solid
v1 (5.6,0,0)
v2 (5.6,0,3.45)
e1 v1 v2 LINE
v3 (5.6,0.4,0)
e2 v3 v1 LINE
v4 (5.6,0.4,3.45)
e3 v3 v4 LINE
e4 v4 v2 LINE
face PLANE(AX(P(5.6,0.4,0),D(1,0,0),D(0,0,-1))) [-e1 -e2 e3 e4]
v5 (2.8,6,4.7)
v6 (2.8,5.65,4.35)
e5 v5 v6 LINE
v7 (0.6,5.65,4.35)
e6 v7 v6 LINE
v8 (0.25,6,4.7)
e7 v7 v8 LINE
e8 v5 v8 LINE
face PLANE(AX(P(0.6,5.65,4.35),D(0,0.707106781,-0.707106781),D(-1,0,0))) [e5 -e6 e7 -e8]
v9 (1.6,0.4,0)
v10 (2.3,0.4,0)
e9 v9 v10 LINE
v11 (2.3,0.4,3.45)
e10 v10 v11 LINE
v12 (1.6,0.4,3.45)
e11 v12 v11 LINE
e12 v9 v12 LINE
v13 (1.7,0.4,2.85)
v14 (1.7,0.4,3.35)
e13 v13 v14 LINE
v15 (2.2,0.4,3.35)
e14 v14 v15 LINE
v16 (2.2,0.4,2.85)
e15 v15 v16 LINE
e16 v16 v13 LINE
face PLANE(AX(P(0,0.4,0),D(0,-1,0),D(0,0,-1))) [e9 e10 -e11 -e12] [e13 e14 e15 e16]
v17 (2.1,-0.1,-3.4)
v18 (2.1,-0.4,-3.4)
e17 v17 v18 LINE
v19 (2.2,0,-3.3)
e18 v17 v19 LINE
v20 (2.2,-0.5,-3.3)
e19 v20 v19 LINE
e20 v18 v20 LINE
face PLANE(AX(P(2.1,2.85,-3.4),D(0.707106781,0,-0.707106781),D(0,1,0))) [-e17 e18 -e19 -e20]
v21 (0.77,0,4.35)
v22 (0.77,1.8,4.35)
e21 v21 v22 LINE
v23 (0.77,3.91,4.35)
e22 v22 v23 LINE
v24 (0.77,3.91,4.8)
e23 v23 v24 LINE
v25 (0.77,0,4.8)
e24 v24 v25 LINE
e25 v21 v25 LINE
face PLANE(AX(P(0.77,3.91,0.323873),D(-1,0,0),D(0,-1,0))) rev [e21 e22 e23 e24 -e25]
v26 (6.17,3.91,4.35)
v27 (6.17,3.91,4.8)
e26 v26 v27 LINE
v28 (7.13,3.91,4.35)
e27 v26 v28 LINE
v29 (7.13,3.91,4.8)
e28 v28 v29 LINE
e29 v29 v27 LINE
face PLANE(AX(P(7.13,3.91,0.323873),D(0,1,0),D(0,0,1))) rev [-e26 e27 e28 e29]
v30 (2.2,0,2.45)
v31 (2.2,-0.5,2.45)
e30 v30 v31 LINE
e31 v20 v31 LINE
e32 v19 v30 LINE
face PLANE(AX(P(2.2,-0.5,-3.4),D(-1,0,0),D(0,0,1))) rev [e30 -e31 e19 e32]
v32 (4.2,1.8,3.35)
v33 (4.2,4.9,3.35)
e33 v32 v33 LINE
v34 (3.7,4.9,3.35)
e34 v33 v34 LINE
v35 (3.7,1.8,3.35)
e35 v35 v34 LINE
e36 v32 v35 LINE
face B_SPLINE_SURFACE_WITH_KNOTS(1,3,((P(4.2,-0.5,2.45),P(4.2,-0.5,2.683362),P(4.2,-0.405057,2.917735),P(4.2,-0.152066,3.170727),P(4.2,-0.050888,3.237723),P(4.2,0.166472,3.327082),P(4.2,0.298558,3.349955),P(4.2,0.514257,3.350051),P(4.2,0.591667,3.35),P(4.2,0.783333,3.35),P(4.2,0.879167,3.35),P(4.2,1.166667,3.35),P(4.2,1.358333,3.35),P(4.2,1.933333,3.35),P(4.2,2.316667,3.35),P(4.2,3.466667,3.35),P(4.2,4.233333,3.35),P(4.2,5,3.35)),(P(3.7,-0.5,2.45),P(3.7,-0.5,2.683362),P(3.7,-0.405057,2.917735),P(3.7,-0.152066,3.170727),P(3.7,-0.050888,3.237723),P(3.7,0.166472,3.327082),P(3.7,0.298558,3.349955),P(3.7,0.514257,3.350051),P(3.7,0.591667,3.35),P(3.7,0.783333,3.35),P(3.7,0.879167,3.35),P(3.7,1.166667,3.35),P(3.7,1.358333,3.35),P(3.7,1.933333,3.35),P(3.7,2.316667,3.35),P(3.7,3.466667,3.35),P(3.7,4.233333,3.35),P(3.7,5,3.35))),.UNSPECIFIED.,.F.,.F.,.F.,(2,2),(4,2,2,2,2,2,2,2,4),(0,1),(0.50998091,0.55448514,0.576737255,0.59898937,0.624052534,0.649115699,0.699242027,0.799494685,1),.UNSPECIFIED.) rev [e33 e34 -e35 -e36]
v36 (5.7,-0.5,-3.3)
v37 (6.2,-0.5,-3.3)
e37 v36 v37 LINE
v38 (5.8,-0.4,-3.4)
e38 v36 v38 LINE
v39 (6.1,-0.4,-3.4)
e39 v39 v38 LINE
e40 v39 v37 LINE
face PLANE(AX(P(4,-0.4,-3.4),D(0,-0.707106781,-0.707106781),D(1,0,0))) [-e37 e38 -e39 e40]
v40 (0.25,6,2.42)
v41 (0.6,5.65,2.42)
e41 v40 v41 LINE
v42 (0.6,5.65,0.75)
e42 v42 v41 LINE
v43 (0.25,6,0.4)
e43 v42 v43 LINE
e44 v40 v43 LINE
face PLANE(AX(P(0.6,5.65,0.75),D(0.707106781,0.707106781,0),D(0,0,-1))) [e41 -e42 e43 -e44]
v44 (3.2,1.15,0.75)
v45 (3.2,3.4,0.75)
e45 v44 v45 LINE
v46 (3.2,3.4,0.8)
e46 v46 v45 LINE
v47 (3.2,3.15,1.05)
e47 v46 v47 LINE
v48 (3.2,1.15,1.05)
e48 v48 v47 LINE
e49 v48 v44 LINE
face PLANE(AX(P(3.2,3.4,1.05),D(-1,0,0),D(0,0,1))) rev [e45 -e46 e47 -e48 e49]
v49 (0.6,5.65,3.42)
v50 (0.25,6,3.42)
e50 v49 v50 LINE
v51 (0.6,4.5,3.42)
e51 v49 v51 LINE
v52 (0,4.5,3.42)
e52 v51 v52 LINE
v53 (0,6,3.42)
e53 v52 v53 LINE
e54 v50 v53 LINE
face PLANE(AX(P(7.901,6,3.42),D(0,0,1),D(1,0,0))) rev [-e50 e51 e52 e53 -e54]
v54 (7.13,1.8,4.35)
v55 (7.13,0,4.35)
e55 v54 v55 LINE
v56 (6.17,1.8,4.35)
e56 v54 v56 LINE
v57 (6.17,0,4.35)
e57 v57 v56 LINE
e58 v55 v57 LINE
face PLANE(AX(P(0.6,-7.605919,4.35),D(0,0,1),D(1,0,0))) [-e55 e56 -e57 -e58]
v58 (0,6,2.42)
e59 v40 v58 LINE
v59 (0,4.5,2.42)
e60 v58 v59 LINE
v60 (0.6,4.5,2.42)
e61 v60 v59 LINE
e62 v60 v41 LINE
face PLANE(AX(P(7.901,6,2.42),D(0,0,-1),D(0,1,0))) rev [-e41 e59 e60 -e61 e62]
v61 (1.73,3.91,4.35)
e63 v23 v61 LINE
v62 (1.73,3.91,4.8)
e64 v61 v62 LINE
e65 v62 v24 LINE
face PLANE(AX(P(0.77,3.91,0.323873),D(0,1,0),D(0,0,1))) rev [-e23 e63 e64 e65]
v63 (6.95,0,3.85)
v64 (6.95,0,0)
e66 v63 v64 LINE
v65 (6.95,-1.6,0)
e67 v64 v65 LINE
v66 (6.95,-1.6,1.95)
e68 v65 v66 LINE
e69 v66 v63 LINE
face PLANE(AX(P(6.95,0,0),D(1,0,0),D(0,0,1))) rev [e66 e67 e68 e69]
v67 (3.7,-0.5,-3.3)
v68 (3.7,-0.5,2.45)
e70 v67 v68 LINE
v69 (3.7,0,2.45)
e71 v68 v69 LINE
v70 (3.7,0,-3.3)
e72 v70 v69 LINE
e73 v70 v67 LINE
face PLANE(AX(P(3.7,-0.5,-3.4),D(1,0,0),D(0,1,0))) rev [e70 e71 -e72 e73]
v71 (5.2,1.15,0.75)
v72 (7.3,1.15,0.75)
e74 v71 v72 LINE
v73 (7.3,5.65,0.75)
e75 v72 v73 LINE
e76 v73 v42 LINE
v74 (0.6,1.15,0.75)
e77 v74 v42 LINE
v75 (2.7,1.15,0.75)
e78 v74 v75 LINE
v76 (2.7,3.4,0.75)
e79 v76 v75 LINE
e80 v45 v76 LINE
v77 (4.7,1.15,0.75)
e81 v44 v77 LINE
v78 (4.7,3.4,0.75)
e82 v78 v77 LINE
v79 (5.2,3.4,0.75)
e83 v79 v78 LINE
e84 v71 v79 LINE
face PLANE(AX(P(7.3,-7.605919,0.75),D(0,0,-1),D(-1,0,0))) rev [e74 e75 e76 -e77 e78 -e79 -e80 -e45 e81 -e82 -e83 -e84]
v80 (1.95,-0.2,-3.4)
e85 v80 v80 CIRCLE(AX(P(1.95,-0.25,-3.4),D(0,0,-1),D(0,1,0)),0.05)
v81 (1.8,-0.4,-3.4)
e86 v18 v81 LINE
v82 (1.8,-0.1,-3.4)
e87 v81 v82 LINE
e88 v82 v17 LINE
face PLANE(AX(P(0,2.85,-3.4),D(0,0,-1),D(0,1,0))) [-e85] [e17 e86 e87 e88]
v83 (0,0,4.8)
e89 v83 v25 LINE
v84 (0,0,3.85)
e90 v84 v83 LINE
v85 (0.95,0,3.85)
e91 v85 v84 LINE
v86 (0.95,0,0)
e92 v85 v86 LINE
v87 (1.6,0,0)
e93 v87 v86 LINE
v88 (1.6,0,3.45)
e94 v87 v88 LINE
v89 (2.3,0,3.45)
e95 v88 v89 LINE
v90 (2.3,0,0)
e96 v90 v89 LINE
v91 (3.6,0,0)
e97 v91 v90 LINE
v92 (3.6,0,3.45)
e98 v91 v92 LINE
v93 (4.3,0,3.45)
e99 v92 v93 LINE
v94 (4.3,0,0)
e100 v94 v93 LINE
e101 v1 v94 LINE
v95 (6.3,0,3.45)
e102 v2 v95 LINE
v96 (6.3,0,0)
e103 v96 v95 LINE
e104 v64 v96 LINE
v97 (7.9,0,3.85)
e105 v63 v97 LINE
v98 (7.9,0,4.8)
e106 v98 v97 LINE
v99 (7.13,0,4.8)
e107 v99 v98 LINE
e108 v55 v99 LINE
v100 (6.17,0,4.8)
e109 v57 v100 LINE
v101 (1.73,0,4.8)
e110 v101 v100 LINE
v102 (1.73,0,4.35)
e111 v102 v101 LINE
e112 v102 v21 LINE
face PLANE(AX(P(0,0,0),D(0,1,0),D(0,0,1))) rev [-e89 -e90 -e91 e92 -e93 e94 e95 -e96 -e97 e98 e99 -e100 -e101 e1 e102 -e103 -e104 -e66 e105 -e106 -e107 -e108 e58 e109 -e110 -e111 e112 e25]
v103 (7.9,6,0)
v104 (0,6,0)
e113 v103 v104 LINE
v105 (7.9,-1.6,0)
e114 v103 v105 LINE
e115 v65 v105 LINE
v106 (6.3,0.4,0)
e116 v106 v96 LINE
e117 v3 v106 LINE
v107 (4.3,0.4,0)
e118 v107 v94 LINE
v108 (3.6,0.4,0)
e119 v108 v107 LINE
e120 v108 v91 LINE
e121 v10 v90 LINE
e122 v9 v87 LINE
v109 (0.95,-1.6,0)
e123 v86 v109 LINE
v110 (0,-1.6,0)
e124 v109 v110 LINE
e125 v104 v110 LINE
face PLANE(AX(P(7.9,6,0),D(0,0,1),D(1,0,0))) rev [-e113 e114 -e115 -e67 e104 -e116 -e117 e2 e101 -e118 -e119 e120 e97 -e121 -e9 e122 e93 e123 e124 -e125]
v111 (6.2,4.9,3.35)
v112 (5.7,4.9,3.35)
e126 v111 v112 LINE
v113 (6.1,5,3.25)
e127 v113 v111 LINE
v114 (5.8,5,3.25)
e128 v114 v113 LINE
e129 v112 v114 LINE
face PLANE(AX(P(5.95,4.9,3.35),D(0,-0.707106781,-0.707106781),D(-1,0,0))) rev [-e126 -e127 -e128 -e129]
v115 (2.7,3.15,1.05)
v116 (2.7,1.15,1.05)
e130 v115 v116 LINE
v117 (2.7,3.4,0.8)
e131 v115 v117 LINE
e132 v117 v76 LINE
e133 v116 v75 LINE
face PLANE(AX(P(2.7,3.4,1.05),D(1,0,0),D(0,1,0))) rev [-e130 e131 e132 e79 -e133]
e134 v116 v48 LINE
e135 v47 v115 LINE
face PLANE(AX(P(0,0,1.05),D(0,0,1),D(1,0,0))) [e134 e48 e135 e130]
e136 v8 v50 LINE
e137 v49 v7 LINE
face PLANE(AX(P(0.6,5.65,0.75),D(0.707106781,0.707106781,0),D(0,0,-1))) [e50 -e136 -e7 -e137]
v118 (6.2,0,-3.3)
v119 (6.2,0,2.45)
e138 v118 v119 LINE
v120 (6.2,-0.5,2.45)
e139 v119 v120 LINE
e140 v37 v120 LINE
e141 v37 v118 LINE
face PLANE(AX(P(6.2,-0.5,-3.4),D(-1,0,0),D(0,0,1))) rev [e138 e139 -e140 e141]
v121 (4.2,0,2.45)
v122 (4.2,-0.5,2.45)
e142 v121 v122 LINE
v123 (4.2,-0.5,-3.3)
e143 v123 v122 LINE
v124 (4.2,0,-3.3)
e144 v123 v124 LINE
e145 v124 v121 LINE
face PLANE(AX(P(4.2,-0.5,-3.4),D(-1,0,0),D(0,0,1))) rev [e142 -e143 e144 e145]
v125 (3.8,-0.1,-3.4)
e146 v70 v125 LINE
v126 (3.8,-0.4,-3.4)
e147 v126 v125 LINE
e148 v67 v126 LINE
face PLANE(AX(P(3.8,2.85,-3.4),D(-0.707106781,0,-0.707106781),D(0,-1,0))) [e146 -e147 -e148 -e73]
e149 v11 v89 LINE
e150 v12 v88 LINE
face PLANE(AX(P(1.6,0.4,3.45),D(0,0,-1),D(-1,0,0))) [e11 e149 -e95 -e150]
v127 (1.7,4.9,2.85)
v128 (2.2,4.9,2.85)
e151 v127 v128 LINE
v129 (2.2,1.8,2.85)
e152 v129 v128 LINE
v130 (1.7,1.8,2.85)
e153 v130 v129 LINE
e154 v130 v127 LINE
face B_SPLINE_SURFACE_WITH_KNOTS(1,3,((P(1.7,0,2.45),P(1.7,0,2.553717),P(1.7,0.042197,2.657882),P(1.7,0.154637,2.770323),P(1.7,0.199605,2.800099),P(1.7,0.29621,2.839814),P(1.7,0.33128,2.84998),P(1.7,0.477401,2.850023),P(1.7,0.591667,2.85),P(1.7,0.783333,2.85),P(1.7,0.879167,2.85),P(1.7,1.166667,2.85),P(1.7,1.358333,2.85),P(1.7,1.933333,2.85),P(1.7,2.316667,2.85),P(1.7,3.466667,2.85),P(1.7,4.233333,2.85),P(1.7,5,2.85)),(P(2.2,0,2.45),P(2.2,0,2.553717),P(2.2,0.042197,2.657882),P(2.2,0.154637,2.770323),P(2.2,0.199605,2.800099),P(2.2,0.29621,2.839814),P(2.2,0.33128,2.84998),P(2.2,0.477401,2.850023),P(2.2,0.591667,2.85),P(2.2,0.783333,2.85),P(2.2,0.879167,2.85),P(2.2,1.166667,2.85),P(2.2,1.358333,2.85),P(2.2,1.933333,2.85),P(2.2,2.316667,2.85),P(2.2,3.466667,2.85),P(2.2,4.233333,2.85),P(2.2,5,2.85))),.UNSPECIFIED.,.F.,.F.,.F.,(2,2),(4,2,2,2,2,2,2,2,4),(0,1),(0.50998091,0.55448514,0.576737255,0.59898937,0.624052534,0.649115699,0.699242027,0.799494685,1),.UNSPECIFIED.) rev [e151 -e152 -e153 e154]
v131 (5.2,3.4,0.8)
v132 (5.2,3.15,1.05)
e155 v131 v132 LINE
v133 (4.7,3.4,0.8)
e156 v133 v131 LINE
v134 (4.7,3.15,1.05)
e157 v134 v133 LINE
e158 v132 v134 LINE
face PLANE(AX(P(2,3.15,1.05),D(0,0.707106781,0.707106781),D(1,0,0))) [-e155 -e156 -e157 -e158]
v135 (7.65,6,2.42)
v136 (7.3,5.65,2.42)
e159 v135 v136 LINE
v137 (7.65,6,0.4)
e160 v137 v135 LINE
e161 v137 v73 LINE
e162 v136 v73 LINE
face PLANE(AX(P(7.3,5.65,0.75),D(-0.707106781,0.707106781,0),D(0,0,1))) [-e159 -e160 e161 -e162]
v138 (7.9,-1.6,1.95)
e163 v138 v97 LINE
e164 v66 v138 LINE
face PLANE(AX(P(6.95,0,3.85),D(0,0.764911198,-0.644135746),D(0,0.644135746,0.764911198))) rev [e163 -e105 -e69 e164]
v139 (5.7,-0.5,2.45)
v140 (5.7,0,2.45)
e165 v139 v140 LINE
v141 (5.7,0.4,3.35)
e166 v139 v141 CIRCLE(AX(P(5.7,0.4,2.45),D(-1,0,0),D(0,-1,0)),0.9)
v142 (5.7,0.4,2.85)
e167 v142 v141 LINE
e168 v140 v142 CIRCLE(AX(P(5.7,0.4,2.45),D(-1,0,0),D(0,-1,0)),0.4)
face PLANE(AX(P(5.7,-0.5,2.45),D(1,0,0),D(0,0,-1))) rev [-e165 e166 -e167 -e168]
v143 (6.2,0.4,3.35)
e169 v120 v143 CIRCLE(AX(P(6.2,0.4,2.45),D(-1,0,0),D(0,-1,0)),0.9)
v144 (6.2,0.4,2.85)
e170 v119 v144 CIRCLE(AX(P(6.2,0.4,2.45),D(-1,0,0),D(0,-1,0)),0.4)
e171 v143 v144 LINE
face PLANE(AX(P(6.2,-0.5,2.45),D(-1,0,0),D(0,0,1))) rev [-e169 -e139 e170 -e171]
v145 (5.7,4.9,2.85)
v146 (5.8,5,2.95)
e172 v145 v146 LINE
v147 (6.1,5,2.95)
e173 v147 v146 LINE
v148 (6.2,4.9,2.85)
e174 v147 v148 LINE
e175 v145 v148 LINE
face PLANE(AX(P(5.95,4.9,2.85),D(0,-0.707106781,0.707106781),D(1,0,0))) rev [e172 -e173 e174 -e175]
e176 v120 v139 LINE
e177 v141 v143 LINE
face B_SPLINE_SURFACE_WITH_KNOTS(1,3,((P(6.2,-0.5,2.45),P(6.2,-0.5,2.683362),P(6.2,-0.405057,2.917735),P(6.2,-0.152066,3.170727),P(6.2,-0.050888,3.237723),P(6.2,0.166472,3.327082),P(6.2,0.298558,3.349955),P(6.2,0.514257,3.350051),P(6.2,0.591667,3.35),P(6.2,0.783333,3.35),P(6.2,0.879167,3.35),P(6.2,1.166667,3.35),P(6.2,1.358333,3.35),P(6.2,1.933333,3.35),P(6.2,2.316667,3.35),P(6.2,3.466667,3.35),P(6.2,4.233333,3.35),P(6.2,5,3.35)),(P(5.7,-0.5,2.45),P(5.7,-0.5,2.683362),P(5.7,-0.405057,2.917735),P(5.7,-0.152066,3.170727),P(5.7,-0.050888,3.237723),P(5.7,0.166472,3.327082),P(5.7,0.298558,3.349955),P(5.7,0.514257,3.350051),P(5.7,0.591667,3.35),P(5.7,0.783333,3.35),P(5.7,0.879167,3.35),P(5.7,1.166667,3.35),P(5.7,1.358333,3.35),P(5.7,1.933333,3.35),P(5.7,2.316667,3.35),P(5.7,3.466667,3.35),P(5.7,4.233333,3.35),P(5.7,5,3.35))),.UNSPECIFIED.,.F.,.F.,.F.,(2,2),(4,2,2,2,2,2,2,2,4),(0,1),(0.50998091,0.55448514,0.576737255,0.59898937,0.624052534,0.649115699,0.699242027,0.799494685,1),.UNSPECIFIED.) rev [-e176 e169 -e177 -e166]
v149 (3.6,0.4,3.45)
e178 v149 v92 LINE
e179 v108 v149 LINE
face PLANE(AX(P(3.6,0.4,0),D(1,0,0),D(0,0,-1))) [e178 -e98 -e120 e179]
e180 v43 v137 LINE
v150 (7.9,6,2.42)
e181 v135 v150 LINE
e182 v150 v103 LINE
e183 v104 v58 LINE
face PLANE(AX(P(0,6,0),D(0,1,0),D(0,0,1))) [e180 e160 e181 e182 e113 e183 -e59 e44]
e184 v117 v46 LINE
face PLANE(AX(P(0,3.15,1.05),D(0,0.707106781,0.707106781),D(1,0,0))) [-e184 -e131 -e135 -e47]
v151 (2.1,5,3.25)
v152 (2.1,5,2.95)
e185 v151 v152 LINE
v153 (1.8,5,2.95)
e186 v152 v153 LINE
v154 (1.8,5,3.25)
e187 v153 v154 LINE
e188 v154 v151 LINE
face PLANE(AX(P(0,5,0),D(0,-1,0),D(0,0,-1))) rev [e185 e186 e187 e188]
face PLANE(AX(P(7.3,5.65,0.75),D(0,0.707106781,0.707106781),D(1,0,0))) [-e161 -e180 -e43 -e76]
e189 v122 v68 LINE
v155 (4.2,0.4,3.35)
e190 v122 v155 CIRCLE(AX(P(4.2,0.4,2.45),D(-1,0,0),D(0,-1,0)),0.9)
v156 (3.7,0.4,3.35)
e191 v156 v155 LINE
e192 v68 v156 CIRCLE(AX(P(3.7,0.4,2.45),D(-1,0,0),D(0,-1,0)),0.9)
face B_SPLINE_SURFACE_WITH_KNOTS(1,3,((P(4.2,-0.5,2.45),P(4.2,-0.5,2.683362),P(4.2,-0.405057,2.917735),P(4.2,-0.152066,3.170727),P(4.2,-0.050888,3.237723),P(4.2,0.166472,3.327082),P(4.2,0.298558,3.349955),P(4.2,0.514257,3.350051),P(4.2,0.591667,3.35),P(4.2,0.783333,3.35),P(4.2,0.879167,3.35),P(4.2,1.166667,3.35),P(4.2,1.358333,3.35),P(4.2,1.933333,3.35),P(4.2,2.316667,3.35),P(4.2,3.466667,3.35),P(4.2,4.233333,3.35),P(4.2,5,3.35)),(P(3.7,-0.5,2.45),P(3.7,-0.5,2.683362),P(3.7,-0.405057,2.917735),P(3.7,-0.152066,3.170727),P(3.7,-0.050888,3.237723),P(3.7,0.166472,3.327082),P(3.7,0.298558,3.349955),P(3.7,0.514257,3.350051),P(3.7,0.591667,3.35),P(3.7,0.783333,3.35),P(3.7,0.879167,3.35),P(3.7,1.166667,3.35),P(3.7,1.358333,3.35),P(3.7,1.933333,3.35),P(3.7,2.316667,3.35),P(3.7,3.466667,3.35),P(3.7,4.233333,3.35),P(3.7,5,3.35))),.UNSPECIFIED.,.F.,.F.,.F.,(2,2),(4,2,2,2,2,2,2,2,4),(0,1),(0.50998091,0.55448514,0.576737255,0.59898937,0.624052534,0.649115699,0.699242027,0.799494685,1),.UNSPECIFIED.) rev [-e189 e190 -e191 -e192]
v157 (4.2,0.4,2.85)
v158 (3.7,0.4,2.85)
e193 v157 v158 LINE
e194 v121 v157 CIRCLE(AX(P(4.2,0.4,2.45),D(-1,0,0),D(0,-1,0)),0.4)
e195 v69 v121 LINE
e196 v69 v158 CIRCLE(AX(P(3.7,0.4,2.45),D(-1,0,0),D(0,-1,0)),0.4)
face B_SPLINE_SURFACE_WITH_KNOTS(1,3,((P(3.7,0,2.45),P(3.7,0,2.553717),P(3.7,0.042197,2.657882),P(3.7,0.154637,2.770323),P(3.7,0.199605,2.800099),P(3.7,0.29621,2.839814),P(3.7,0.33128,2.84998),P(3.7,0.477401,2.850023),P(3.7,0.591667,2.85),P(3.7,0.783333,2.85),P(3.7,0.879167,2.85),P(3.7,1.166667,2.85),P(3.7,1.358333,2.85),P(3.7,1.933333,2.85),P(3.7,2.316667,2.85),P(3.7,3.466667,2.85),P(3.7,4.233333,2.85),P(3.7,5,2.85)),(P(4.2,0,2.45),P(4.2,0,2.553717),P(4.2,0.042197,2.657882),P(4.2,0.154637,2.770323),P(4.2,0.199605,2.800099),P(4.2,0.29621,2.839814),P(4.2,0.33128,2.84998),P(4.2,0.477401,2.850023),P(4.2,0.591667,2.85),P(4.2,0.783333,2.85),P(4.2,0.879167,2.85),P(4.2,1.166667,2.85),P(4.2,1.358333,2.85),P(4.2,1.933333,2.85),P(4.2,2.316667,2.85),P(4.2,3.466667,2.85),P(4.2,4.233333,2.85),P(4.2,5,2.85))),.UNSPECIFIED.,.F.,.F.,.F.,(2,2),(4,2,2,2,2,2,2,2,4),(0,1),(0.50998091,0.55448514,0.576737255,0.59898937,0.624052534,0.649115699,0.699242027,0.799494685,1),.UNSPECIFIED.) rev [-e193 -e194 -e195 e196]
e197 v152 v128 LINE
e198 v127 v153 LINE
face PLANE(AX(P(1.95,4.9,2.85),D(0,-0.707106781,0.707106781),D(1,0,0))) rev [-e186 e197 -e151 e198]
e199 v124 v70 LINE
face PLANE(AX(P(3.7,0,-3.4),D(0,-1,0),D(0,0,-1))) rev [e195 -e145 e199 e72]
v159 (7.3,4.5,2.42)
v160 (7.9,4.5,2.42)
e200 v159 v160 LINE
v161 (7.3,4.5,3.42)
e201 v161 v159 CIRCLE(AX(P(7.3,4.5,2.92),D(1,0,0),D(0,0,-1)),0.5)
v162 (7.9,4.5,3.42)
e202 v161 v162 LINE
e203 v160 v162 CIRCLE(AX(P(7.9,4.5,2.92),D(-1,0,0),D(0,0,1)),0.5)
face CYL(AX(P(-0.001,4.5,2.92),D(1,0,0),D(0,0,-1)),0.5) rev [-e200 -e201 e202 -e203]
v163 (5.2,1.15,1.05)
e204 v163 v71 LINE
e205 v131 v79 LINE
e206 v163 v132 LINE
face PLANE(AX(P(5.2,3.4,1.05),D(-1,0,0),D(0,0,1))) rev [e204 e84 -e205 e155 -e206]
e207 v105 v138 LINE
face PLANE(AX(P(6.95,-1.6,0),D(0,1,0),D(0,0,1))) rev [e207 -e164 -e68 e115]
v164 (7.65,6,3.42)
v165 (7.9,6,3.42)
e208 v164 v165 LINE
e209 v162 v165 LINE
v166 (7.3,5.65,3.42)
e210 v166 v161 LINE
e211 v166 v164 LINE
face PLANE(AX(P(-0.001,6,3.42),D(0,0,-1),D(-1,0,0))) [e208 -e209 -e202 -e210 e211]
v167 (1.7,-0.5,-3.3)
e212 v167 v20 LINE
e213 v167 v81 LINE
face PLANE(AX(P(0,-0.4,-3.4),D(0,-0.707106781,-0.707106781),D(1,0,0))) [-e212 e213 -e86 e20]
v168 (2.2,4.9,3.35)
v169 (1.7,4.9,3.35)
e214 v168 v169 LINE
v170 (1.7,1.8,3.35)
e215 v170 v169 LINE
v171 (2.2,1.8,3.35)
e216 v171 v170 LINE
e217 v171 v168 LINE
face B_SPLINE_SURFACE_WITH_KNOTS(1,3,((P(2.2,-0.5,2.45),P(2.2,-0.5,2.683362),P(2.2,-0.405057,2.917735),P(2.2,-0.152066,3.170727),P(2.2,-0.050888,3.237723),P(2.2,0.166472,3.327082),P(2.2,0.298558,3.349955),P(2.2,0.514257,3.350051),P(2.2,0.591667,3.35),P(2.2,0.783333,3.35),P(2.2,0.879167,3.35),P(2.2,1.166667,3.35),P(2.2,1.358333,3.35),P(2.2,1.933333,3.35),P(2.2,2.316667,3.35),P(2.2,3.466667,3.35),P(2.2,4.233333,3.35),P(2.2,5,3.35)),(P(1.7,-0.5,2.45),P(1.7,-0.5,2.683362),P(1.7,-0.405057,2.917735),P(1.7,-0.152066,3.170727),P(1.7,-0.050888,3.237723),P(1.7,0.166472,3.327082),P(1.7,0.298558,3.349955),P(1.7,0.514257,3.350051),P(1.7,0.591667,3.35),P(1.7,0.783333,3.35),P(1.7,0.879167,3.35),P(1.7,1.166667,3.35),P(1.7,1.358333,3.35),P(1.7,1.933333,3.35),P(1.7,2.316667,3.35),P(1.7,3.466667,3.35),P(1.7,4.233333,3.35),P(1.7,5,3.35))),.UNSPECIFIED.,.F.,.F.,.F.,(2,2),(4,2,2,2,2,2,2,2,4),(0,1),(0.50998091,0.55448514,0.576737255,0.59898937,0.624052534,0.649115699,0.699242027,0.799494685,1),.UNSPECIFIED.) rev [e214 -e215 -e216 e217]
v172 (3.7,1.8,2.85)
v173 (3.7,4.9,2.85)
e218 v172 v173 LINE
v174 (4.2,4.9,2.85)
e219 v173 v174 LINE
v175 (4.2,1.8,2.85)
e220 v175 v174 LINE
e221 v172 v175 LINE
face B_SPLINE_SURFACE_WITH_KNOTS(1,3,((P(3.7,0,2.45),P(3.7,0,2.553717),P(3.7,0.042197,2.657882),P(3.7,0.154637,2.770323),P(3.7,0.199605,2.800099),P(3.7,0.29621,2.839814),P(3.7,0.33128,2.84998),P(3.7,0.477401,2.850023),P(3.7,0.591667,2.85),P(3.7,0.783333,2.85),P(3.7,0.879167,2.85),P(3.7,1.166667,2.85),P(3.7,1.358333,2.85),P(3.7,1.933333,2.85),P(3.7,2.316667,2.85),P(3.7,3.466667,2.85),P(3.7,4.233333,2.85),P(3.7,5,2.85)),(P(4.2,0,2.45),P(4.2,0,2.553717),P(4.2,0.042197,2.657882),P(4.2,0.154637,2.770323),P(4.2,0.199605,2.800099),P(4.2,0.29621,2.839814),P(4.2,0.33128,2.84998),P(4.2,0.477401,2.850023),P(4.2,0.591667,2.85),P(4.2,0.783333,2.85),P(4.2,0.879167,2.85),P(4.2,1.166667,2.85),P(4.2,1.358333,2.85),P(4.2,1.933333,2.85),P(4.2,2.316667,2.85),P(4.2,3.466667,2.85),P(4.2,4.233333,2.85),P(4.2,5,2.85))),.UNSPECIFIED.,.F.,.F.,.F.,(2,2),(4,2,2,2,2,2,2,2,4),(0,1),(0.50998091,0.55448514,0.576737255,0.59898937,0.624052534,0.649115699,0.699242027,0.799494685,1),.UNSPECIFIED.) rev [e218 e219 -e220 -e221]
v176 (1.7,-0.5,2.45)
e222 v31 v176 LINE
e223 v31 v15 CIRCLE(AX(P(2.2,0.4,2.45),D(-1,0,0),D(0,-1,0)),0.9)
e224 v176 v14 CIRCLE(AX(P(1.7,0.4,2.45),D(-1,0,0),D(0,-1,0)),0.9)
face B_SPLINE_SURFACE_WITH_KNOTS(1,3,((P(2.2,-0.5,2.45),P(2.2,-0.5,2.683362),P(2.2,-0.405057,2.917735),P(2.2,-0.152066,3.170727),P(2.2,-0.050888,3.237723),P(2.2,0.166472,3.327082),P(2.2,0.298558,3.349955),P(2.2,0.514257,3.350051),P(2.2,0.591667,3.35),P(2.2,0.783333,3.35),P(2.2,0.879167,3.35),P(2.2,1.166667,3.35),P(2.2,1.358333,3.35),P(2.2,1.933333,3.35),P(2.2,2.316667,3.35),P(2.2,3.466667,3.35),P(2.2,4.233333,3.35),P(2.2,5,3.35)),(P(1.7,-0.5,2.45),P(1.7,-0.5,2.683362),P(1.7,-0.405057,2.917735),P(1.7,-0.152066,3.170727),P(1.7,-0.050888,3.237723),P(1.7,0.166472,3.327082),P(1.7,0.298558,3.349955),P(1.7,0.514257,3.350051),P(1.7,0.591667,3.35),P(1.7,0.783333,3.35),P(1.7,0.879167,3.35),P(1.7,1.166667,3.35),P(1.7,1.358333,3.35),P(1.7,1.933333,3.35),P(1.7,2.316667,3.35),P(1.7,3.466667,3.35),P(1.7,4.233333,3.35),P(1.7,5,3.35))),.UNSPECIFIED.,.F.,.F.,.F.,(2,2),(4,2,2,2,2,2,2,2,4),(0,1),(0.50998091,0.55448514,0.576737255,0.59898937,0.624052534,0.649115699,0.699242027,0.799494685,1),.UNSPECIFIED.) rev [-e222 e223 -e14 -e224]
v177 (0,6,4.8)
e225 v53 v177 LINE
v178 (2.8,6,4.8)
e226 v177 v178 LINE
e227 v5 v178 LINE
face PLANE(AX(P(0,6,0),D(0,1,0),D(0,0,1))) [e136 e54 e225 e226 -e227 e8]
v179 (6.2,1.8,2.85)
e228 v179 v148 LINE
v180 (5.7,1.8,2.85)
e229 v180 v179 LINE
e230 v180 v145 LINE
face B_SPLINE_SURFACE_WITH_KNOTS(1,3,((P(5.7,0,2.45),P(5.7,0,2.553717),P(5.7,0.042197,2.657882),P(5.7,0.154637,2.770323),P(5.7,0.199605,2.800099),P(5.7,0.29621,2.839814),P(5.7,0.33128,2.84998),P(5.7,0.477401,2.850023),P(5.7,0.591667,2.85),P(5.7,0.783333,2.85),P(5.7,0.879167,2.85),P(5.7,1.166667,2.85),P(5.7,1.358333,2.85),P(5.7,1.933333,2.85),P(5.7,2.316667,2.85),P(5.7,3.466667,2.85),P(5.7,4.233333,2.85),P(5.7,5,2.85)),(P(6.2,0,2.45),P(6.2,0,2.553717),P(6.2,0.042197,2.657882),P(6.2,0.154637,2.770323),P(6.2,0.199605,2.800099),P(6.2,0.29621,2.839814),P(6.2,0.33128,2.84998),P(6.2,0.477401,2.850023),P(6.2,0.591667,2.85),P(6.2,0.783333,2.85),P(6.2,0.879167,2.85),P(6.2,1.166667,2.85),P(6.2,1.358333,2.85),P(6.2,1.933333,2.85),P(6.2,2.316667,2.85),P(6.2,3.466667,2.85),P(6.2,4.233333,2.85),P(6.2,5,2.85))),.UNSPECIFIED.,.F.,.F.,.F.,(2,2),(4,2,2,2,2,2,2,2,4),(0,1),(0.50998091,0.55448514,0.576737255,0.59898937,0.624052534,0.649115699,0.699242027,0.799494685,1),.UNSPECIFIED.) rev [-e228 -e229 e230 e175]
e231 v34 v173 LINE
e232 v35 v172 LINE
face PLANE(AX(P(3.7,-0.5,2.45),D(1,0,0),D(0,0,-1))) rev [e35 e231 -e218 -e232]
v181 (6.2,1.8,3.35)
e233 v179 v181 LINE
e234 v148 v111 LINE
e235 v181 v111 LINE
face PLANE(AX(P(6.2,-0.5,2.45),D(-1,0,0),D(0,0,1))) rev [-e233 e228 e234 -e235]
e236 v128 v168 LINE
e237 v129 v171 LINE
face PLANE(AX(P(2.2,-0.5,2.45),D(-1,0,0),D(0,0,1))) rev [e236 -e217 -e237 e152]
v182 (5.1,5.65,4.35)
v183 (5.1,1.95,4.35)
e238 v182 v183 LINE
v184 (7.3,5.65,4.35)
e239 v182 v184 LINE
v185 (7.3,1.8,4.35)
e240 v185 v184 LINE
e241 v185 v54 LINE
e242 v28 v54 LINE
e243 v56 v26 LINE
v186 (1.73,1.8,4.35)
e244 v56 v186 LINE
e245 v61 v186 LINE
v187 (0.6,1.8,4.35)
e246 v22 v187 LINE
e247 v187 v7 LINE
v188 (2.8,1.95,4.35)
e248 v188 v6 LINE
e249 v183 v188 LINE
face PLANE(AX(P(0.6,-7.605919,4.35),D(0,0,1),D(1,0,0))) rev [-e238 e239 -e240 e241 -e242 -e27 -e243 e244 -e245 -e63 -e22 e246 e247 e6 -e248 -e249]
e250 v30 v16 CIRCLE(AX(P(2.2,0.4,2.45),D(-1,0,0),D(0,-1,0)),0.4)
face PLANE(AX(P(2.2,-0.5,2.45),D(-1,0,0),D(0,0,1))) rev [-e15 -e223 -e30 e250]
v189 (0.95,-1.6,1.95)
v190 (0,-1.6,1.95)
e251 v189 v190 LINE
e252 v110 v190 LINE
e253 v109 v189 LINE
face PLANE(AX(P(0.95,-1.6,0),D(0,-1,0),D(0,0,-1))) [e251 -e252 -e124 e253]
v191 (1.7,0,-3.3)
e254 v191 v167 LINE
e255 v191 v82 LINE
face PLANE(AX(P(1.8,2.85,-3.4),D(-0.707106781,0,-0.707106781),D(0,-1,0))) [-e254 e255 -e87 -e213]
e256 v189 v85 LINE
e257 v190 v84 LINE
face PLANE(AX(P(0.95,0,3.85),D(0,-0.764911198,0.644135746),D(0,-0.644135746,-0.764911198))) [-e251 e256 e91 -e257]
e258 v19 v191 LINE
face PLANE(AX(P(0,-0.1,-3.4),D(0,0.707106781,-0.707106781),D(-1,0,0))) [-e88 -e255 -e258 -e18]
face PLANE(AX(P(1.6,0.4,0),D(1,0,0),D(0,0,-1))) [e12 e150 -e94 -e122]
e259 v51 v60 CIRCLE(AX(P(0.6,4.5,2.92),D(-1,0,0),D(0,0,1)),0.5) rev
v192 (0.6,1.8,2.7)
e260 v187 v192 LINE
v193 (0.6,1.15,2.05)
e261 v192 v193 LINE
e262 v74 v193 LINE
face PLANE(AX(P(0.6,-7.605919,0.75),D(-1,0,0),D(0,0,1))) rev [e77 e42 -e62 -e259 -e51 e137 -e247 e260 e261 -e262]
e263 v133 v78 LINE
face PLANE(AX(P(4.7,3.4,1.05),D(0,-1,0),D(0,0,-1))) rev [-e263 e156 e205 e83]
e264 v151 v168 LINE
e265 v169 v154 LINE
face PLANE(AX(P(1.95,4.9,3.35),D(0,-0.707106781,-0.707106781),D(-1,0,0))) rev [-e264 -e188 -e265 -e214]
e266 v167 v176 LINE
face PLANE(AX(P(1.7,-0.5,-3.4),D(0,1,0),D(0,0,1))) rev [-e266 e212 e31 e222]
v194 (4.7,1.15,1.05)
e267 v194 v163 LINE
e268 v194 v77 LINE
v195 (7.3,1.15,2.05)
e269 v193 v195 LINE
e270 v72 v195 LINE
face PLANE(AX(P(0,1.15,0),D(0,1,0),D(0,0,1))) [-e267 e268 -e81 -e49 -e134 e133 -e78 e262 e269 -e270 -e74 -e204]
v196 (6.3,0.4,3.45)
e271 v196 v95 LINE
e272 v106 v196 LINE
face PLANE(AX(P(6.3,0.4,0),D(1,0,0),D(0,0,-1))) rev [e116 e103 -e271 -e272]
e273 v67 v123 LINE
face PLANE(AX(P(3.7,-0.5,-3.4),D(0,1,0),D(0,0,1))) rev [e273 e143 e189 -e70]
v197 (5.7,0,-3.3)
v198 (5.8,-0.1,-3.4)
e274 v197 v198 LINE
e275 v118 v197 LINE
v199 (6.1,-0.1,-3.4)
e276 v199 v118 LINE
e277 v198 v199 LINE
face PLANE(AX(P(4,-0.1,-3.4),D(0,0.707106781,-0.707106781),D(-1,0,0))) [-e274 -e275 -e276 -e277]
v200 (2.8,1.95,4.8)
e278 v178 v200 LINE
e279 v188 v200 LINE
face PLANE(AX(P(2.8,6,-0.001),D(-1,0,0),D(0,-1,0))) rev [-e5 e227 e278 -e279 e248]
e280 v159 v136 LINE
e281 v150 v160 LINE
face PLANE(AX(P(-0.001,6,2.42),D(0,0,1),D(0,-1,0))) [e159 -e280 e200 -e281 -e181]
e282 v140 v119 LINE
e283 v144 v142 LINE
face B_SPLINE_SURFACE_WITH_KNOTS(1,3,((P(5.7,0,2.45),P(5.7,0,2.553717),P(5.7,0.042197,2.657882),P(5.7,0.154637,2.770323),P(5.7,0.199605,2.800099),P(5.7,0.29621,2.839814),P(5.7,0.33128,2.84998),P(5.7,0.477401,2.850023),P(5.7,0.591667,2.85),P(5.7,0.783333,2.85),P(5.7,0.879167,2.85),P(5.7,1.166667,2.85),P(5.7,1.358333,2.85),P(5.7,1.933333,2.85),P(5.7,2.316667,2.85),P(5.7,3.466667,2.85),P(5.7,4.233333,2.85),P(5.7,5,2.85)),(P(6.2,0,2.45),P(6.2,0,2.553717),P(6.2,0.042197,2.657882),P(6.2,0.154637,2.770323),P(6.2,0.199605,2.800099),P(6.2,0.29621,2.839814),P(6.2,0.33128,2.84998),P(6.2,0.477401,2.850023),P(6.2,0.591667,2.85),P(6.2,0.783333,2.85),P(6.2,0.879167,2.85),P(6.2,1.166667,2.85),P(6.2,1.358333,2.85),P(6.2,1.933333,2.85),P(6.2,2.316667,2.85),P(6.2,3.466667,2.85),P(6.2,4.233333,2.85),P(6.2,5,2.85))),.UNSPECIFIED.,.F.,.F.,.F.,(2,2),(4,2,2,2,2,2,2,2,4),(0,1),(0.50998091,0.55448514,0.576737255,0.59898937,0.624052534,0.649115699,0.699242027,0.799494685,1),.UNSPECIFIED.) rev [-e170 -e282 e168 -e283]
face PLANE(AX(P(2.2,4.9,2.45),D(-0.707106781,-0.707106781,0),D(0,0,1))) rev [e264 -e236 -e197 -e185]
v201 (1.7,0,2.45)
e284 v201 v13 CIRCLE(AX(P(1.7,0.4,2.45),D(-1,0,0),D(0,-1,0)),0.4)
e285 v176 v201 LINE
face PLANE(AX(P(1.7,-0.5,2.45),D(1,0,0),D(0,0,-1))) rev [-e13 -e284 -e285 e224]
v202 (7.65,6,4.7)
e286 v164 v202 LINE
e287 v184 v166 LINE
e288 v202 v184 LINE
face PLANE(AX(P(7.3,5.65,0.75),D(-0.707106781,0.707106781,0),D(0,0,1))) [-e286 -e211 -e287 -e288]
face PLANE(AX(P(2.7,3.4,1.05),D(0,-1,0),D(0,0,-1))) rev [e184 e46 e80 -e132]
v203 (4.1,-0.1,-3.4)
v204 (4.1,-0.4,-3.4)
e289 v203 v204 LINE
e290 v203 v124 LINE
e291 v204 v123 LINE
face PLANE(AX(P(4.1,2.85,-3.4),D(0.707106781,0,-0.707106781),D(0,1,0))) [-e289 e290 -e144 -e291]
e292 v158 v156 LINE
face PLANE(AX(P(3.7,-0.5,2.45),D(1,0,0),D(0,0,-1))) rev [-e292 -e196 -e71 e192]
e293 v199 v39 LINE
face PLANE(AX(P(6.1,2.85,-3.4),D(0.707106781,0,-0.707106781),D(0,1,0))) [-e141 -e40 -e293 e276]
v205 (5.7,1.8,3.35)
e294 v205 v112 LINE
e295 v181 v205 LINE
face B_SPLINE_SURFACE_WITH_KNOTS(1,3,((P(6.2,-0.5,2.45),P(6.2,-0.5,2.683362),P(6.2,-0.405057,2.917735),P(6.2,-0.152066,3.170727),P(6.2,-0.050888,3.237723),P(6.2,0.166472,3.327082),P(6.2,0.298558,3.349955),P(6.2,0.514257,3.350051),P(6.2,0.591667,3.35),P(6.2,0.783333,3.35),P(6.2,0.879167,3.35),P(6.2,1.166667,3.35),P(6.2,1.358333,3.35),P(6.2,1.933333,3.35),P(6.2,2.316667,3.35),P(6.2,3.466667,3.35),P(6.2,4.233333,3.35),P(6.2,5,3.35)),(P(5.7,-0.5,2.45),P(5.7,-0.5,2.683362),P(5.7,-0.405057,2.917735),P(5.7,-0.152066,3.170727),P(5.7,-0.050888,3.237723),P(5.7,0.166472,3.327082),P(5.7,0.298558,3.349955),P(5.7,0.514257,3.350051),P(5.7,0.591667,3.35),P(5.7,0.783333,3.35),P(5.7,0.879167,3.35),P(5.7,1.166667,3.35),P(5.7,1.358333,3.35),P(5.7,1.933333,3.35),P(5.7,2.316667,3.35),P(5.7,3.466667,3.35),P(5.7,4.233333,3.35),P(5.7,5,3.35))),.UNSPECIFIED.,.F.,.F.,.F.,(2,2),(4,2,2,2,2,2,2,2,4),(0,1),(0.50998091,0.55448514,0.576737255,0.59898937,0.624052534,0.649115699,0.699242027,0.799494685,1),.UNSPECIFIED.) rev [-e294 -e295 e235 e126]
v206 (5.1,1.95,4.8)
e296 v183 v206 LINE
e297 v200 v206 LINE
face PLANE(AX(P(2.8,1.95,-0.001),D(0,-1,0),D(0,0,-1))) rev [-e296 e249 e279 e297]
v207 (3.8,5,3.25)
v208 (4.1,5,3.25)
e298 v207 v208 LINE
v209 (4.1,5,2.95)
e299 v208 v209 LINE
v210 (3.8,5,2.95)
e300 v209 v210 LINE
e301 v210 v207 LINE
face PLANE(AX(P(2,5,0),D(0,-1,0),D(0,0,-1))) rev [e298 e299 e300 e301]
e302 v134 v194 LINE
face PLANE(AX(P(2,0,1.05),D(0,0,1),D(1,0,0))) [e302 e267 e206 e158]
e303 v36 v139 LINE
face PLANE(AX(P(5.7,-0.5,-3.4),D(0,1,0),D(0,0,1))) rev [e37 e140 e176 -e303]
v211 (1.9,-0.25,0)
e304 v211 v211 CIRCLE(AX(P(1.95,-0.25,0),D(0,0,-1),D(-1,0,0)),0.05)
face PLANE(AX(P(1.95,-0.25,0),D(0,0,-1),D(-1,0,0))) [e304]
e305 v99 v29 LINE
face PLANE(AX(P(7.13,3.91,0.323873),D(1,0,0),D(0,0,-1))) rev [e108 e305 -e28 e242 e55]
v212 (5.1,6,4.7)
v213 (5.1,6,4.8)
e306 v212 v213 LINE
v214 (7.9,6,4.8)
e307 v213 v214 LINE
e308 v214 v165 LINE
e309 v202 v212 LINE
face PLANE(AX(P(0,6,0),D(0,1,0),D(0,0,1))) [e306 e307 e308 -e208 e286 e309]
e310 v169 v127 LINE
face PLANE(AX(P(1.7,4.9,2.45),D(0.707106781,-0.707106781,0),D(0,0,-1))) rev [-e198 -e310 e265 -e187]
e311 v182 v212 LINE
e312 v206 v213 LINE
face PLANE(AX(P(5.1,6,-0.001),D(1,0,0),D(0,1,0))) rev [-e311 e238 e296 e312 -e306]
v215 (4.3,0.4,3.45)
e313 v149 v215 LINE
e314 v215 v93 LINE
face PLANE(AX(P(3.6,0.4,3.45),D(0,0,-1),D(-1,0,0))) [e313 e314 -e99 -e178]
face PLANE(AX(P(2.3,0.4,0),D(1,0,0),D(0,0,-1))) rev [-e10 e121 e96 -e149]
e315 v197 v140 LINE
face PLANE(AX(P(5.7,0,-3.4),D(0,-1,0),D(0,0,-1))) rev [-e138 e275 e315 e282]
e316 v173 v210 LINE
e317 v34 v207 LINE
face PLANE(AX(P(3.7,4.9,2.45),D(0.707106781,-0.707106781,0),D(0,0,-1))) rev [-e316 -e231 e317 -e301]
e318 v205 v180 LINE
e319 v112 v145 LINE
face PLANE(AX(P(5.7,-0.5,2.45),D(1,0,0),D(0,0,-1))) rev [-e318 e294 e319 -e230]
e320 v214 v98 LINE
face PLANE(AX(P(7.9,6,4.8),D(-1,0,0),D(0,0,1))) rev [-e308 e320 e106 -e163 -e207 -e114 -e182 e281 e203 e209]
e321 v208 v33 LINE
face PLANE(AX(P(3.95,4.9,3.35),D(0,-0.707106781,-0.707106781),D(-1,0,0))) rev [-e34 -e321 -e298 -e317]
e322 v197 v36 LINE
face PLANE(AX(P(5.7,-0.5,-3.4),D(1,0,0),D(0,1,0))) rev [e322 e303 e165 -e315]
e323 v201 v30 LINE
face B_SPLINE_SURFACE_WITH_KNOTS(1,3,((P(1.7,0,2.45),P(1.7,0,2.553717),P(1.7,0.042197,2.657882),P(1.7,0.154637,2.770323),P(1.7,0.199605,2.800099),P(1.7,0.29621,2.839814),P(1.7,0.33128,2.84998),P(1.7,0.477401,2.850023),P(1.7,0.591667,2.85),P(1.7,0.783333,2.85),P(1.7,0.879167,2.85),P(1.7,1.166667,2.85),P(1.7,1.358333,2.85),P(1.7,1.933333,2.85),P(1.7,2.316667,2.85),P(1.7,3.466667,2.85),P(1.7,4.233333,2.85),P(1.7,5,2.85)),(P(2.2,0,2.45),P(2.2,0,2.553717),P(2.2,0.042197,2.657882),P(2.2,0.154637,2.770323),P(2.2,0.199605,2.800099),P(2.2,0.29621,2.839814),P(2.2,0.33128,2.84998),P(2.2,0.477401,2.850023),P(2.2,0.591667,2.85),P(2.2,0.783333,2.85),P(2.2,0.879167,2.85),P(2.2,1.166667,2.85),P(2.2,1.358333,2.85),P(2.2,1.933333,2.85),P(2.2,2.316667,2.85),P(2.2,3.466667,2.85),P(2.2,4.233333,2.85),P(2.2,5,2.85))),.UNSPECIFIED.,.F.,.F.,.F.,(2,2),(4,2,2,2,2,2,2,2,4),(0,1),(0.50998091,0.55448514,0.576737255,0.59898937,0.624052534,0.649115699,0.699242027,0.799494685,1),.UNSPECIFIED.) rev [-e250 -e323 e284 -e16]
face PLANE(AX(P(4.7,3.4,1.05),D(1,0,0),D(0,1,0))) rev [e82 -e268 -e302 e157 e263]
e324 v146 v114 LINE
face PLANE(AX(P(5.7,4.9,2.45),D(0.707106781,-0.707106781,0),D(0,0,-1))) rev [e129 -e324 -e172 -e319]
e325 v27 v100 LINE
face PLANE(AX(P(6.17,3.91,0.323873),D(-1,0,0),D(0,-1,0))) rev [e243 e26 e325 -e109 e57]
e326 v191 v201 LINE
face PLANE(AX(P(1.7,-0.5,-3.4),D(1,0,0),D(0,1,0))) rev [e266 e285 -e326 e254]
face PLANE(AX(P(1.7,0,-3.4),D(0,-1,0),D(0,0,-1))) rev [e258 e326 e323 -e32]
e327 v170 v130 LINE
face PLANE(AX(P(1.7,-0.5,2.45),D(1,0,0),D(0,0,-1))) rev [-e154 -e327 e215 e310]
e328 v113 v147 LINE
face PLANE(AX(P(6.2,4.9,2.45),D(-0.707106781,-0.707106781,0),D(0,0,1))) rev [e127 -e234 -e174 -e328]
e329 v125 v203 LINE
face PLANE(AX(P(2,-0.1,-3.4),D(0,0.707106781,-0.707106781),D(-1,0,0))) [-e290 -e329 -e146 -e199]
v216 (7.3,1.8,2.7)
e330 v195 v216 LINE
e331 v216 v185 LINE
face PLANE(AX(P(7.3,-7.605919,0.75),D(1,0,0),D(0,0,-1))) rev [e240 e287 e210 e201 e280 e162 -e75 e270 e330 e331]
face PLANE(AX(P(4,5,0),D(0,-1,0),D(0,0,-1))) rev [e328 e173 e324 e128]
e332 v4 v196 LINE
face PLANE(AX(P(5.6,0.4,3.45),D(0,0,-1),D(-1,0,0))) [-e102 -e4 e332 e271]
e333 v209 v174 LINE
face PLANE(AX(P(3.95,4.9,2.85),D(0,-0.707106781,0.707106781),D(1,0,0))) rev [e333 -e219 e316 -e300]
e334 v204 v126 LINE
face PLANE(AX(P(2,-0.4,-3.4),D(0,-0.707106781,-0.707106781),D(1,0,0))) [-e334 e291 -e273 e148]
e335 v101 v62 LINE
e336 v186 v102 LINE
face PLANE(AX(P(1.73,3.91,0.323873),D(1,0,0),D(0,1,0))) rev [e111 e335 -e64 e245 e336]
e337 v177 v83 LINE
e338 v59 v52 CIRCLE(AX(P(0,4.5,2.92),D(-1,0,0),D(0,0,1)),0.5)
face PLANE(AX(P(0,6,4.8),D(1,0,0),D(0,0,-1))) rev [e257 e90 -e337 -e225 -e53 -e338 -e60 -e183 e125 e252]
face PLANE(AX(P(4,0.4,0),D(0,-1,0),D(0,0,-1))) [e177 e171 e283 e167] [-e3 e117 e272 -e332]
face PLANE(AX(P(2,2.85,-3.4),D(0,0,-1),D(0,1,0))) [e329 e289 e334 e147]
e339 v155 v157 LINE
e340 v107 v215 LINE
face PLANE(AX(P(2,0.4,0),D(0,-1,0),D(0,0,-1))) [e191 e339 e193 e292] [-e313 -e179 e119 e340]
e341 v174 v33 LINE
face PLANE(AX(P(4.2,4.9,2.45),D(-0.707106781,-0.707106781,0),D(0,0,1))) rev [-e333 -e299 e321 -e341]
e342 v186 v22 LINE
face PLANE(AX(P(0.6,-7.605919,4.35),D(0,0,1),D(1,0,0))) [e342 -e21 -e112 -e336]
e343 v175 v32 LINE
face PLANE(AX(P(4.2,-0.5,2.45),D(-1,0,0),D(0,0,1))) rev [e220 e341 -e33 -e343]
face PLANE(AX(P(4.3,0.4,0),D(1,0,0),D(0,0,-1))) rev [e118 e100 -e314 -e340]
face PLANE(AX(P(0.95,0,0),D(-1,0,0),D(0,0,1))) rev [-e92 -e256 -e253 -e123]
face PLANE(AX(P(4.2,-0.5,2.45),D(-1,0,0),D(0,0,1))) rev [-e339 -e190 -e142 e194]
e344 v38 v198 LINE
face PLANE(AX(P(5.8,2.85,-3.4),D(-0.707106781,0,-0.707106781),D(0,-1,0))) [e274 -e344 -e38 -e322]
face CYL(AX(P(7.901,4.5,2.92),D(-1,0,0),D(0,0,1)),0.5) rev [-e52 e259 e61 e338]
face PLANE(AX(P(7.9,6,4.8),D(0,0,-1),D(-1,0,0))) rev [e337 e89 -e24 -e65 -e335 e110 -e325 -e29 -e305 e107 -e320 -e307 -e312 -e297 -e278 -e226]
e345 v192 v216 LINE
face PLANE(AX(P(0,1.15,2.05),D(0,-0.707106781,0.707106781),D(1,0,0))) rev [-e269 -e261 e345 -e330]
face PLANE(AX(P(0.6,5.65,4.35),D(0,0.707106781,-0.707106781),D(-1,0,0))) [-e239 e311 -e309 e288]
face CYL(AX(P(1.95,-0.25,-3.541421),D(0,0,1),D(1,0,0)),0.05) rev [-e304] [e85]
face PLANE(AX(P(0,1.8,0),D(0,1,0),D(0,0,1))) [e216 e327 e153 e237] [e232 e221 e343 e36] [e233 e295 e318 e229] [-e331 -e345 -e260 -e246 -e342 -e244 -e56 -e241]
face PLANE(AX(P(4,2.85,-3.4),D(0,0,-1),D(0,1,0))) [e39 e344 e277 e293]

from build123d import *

# Parameters (mm, degrees)
BODY1_W                            = 7.9
BODY1_H                            = 4.8
EXTRUDE_1_DEPTH                    = 6
SKETCH_2_W                         = 6.7
SKETCH_2_H                         = 3.6
CUT_EXTRUDE_1_DEPTH                = 4.2
CHAMFER_1_SIZE                     = 0.35
SKETCH_4_W                         = 0.96
SKETCH_4_H                         = 3.91
CUT_EXTRUDE_3_DEPTH                = 0.45
SKETCH_5_W                         = 0.7
SKETCH_5_H                         = 3.45
CUT_EXTRUDE_4_DEPTH                = 0.4
CUT_EXTRUDE_6_REACH                = 13.02
SKETCH_8_W                         = 2.3
SKETCH_8_H                         = 4.05
CUT_EXTRUDE_7_REACH                = 13.02
SKETCH_15_W                        = 6.7
SKETCH_15_H                        = 1.95
CUT_EXTRUDE_9_DEPTH                = 0.65
CHAMFER_7_SIZE                     = 0.65
SKETCH_10_W                        = 0.5
SKETCH_10_H                        = 2.25
EXTRUDE_2_DEPTH                    = 0.3
CHAMFER_2_SIZE                     = 0.25
PATTERN_LINEAR_3_COUNT             = 2
PATTERN_LINEAR_3_PITCH             = 2
CHAMFER_2_OF_PATTERN_LINEAR_3_SIZE = 0.25
EXTRUDE_5_DEPTH                    = 0.95
SWEEP_START                        = 1.7
SWEEP_1_DEPTH                      = 0.5
CHAMFER_8_SIZE                     = 0.1
PATTERN_LINEAR_5_COUNT             = 3
PATTERN_LINEAR_5_PITCH             = 2
CHAMFER_8_OF_PATTERN_LINEAR_5_SIZE = 0.1
SKETCH_18_R                        = 0.05
CUT_EXTRUDE_10_DEPTH               = 3.4


# Read off the part's stored shape, not the designer's step: По траектории1
with BuildPart() as part:
    # Body1 → Бобышка-Вытянуть1 (new body)
    with BuildSketch(Plane(origin=(0, 0, 0), x_dir=(1, 0, 0), z_dir=(0, 1, 0))):
        with Locations((3.95, -2.4)):
            Rectangle(BODY1_W, BODY1_H)
    extrude(amount=EXTRUDE_1_DEPTH)

    # Эскиз2 → Вырез-Вытянуть1 (cut)
    with BuildSketch(Plane(origin=(0, 6, 0), x_dir=(1, 0, 0), z_dir=(0, 1, 0))):
        with Locations((3.95, -2.55)):
            Rectangle(SKETCH_2_W, SKETCH_2_H)
    extrude(amount=-CUT_EXTRUDE_1_DEPTH, mode=Mode.SUBTRACT)

    # Фаска1
    chamfer_1_edges = [part.edges().sort_by_distance(p)[0] for p in [
        (7.3, 6, 2.55),
        (3.95, 6, 0.75),
        (0.6, 6, 2.55),
        (3.95, 6, 4.35),
    ]]
    chamfer(chamfer_1_edges, length=CHAMFER_1_SIZE)

    # Эскиз4 → Вырез-Вытянуть3 (cut)
    with BuildSketch(Plane.XY.offset(4.8)):
        with Locations((1.25, 1.955)):
            Rectangle(SKETCH_4_W, SKETCH_4_H)
        with Locations((6.65, 1.955)):
            Rectangle(SKETCH_4_W, SKETCH_4_H)
    extrude(amount=-CUT_EXTRUDE_3_DEPTH, mode=Mode.SUBTRACT)

    # Эскиз5 → Вырез-Вытянуть4 (cut)
    with BuildSketch(Plane(origin=(0, 0, 4.8), x_dir=(1, 0, 0), z_dir=(0, 1, 0))):
        with Locations((1.95, 3.075)):
            Rectangle(SKETCH_5_W, SKETCH_5_H)
    cut_extrude_4 = extrude(amount=CUT_EXTRUDE_4_DEPTH, mode=Mode.SUBTRACT)

    # Эскиз8 → Вырез-Вытянуть6 (cut, up to next)
    with BuildSketch(Plane.XY.offset(4.8), mode=Mode.PRIVATE) as cut_extrude_6_sk1:
        with Locations((3.95, 3.975)):
            Rectangle(SKETCH_8_W, SKETCH_8_H)
    cut_extrude_6_tool1 = extrude(cut_extrude_6_sk1.sketch, amount=-CUT_EXTRUDE_6_REACH, mode=Mode.PRIVATE) & part.part
    add(cut_extrude_6_tool1.solids().sort_by_distance((3.95, 3.975, 4.8))[0], mode=Mode.SUBTRACT)

    # Эскиз9 → Вырез-Вытянуть7 (cut, up to next)
    with BuildSketch(Plane.ZY, mode=Mode.PRIVATE) as cut_extrude_7_sk1:
        with BuildLine():
            Line((2.42, 6), (3.42, 6))
            Line((3.42, 6), (3.42, 4.5))
            ThreePointArc((3.42, 4.5), (2.92, 4), (2.42, 4.5))
            Line((2.42, 4.5), (2.42, 6))
        make_face()
    cut_extrude_7_tool1 = extrude(cut_extrude_7_sk1.sketch, amount=-CUT_EXTRUDE_7_REACH, mode=Mode.PRIVATE) & part.part
    cut_extrude_7 = cut_extrude_7_tool1.solids().sort_by_distance((0, 5.05036, 2.92))[0]
    add(cut_extrude_7, mode=Mode.SUBTRACT)

    # Зеркальное отражение1: Вырез-Вытянуть7 across plane
    add(cut_extrude_7.mirror(Plane(origin=(3.95, 0, 0), x_dir=(0, 0, 1), z_dir=(1, 0, 0))), mode=Mode.SUBTRACT)

    # Эскиз15 → Вырез-Вытянуть9 (cut)
    with BuildSketch(Plane(origin=(0, 1.8, 0), x_dir=(1, 0, 0), z_dir=(0, 1, 0))):
        with Locations((3.95, -1.725)):
            Rectangle(SKETCH_15_W, SKETCH_15_H)
    extrude(amount=-CUT_EXTRUDE_9_DEPTH, mode=Mode.SUBTRACT)

    # Фаска7
    chamfer_7_edges = [part.edges().sort_by_distance(p)[0] for p in [
        (3.95, 1.15, 2.7),
    ]]
    chamfer(chamfer_7_edges, length=CHAMFER_7_SIZE - 0.0001)  # a hair under: the kernel refuses the full size

    # Эскиз10 → Бобышка-Вытянуть2 (add)
    with BuildSketch(Plane.XY.offset(0.75)):
        with Locations((2.95, 2.275)):
            Rectangle(SKETCH_10_W, SKETCH_10_H)
    extrude_2 = extrude(amount=EXTRUDE_2_DEPTH)

    # Фаска2
    chamfer_2_edges = [part.edges().sort_by_distance(p)[0] for p in [
        (2.95, 3.4, 1.05),
    ]]
    chamfer(chamfer_2_edges, length=CHAMFER_2_SIZE)

    # Линейный массив3: Бобышка-Вытянуть2 ×2
    with Locations(*[(i * PATTERN_LINEAR_3_PITCH, 0, 0) for i in range(1, PATTERN_LINEAR_3_COUNT)]):
        add(extrude_2)

    # Фаска2 of Линейный массив3
    chamfer_2_of_pattern_linear_3_edges = [part.edges().sort_by_distance(p)[0] for p in [
        (4.95, 3.4, 1.05),
    ]]
    chamfer(chamfer_2_of_pattern_linear_3_edges, length=CHAMFER_2_OF_PATTERN_LINEAR_3_SIZE)

    # Эскиз17 → Бобышка-Вытянуть5 (add)
    with BuildSketch(Plane.ZY):
        Polygon((0, -1.6), (1.95, -1.6), (3.85, 0), (0, 0), align=None)
    extrude_5 = extrude(amount=-EXTRUDE_5_DEPTH)

    # Зеркальное отражение3: Бобышка-Вытянуть5 across plane
    add(extrude_5.mirror(Plane(origin=(3.95, 0, 0), x_dir=(0, 0, 1), z_dir=(1, 0, 0))))

    # По траектории1 outline → По траектории1 (add)
    with BuildSketch(Plane.YZ.offset(SWEEP_START)):
        with BuildLine():
            add(Edge.make_bspline(
                [(-0.5, 2.45), (-0.5, 2.683362296), (-0.405057001, 2.917735205), (-0.152065654, 3.170726552), (-0.050887811, 3.237723146), (0.166472235, 3.327081743), (0.298557942, 3.349954697), (0.4, 3.35)],
                knots=[0.50998091, 0.50998091, 0.50998091, 0.50998091, 0.55448514, 0.55448514, 0.576737255, 0.576737255, 0.59898937, 0.59898937, 0.59898937, 0.59898937], degree=3))
            Line((-0.5, 2.45), (-0.5, -3.4))
            Line((-0.5, -3.4), (0, -3.4))
            Line((0, -3.4), (0, 2.45))
            add(Edge.make_bspline(
                [(0, 2.45), (0, 2.553716576), (0.042196888, 2.657882313), (0.154637487, 2.770322912), (0.199605417, 2.800099176), (0.296209882, 2.839814108), (0.331279974, 2.849979865), (0.4, 2.85)],
                knots=[0.50998091, 0.50998091, 0.50998091, 0.50998091, 0.55448514, 0.55448514, 0.576737255, 0.576737255, 0.59898937, 0.59898937, 0.59898937, 0.59898937], degree=3))
            Line((0.4, 2.85), (0.4, 3.35))
        make_face()
        with BuildLine():
            Line((1.8, 3.35), (1.8, 2.85))
            add(Edge.make_bspline(
                [(1.8, 2.85), (2.1, 2.85), (2.4, 2.85), (3.466666667, 2.85), (4.233333333, 2.85), (5, 2.85)],
                knots=[0.721036083, 0.721036083, 0.721036083, 0.721036083, 0.799494685, 0.799494685, 1, 1, 1, 1], degree=3))
            Line((5, 2.85), (5, 3.35))
            add(Edge.make_bspline(
                [(1.8, 3.35), (2.1, 3.35), (2.4, 3.35), (3.466666667, 3.35), (4.233333333, 3.35), (5, 3.35)],
                knots=[0.721036083, 0.721036083, 0.721036083, 0.721036083, 0.799494685, 0.799494685, 1, 1, 1, 1], degree=3))
        make_face()
    sweep_1 = extrude(amount=SWEEP_1_DEPTH)

    # Фаска8
    chamfer_8_edges = [part.edges().sort_by_distance(p)[0] for p in [
        (1.95, 5, 2.85),
        (2.2, 5, 3.1),
        (1.95, 5, 3.35),
        (1.7, 5, 3.1),
        (1.95, -0.5, -3.4),
        (2.2, -0.25, -3.4),
        (1.95, 0, -3.4),
        (1.7, -0.25, -3.4),
    ]]
    chamfer(chamfer_8_edges, length=CHAMFER_8_SIZE)

    # Линейный массив5: Вырез-Вытянуть4, По траектории1 ×3
    with Locations(*[(i * PATTERN_LINEAR_5_PITCH, 0, 0) for i in range(1, PATTERN_LINEAR_5_COUNT)]):
        add(cut_extrude_4, mode=Mode.SUBTRACT)
        add(sweep_1)

    # Фаска8 of Линейный массив5
    chamfer_8_of_pattern_linear_5_edges = [part.edges().sort_by_distance(p)[0] for p in [
        (3.95, 5, 2.85),
        (4.2, 5, 3.1),
        (3.95, 5, 3.35),
        (3.7, 5, 3.1),
        (3.95, -0.5, -3.4),
        (4.2, -0.25, -3.4),
        (3.95, 0, -3.4),
        (3.7, -0.25, -3.4),
        (5.95, 5, 2.85),
        (6.2, 5, 3.1),
        (5.95, 5, 3.35),
        (5.7, 5, 3.1),
        (5.95, -0.5, -3.4),
        (6.2, -0.25, -3.4),
        (5.95, 0, -3.4),
        (5.7, -0.25, -3.4),
    ]]
    chamfer(chamfer_8_of_pattern_linear_5_edges, length=CHAMFER_8_OF_PATTERN_LINEAR_5_SIZE)

    # Эскиз18 → Вырез-Вытянуть10 (cut)
    with BuildSketch(Plane(origin=(0, 0, 0), x_dir=(-1, 0, 0), z_dir=(0, 0, -1))):
        with Locations(Location((-1.95, -0.25, 0), (0, 0, 90))):
            Circle(SKETCH_18_R)
    extrude(amount=CUT_EXTRUDE_10_DEPTH, mode=Mode.SUBTRACT)


solid = part.part
